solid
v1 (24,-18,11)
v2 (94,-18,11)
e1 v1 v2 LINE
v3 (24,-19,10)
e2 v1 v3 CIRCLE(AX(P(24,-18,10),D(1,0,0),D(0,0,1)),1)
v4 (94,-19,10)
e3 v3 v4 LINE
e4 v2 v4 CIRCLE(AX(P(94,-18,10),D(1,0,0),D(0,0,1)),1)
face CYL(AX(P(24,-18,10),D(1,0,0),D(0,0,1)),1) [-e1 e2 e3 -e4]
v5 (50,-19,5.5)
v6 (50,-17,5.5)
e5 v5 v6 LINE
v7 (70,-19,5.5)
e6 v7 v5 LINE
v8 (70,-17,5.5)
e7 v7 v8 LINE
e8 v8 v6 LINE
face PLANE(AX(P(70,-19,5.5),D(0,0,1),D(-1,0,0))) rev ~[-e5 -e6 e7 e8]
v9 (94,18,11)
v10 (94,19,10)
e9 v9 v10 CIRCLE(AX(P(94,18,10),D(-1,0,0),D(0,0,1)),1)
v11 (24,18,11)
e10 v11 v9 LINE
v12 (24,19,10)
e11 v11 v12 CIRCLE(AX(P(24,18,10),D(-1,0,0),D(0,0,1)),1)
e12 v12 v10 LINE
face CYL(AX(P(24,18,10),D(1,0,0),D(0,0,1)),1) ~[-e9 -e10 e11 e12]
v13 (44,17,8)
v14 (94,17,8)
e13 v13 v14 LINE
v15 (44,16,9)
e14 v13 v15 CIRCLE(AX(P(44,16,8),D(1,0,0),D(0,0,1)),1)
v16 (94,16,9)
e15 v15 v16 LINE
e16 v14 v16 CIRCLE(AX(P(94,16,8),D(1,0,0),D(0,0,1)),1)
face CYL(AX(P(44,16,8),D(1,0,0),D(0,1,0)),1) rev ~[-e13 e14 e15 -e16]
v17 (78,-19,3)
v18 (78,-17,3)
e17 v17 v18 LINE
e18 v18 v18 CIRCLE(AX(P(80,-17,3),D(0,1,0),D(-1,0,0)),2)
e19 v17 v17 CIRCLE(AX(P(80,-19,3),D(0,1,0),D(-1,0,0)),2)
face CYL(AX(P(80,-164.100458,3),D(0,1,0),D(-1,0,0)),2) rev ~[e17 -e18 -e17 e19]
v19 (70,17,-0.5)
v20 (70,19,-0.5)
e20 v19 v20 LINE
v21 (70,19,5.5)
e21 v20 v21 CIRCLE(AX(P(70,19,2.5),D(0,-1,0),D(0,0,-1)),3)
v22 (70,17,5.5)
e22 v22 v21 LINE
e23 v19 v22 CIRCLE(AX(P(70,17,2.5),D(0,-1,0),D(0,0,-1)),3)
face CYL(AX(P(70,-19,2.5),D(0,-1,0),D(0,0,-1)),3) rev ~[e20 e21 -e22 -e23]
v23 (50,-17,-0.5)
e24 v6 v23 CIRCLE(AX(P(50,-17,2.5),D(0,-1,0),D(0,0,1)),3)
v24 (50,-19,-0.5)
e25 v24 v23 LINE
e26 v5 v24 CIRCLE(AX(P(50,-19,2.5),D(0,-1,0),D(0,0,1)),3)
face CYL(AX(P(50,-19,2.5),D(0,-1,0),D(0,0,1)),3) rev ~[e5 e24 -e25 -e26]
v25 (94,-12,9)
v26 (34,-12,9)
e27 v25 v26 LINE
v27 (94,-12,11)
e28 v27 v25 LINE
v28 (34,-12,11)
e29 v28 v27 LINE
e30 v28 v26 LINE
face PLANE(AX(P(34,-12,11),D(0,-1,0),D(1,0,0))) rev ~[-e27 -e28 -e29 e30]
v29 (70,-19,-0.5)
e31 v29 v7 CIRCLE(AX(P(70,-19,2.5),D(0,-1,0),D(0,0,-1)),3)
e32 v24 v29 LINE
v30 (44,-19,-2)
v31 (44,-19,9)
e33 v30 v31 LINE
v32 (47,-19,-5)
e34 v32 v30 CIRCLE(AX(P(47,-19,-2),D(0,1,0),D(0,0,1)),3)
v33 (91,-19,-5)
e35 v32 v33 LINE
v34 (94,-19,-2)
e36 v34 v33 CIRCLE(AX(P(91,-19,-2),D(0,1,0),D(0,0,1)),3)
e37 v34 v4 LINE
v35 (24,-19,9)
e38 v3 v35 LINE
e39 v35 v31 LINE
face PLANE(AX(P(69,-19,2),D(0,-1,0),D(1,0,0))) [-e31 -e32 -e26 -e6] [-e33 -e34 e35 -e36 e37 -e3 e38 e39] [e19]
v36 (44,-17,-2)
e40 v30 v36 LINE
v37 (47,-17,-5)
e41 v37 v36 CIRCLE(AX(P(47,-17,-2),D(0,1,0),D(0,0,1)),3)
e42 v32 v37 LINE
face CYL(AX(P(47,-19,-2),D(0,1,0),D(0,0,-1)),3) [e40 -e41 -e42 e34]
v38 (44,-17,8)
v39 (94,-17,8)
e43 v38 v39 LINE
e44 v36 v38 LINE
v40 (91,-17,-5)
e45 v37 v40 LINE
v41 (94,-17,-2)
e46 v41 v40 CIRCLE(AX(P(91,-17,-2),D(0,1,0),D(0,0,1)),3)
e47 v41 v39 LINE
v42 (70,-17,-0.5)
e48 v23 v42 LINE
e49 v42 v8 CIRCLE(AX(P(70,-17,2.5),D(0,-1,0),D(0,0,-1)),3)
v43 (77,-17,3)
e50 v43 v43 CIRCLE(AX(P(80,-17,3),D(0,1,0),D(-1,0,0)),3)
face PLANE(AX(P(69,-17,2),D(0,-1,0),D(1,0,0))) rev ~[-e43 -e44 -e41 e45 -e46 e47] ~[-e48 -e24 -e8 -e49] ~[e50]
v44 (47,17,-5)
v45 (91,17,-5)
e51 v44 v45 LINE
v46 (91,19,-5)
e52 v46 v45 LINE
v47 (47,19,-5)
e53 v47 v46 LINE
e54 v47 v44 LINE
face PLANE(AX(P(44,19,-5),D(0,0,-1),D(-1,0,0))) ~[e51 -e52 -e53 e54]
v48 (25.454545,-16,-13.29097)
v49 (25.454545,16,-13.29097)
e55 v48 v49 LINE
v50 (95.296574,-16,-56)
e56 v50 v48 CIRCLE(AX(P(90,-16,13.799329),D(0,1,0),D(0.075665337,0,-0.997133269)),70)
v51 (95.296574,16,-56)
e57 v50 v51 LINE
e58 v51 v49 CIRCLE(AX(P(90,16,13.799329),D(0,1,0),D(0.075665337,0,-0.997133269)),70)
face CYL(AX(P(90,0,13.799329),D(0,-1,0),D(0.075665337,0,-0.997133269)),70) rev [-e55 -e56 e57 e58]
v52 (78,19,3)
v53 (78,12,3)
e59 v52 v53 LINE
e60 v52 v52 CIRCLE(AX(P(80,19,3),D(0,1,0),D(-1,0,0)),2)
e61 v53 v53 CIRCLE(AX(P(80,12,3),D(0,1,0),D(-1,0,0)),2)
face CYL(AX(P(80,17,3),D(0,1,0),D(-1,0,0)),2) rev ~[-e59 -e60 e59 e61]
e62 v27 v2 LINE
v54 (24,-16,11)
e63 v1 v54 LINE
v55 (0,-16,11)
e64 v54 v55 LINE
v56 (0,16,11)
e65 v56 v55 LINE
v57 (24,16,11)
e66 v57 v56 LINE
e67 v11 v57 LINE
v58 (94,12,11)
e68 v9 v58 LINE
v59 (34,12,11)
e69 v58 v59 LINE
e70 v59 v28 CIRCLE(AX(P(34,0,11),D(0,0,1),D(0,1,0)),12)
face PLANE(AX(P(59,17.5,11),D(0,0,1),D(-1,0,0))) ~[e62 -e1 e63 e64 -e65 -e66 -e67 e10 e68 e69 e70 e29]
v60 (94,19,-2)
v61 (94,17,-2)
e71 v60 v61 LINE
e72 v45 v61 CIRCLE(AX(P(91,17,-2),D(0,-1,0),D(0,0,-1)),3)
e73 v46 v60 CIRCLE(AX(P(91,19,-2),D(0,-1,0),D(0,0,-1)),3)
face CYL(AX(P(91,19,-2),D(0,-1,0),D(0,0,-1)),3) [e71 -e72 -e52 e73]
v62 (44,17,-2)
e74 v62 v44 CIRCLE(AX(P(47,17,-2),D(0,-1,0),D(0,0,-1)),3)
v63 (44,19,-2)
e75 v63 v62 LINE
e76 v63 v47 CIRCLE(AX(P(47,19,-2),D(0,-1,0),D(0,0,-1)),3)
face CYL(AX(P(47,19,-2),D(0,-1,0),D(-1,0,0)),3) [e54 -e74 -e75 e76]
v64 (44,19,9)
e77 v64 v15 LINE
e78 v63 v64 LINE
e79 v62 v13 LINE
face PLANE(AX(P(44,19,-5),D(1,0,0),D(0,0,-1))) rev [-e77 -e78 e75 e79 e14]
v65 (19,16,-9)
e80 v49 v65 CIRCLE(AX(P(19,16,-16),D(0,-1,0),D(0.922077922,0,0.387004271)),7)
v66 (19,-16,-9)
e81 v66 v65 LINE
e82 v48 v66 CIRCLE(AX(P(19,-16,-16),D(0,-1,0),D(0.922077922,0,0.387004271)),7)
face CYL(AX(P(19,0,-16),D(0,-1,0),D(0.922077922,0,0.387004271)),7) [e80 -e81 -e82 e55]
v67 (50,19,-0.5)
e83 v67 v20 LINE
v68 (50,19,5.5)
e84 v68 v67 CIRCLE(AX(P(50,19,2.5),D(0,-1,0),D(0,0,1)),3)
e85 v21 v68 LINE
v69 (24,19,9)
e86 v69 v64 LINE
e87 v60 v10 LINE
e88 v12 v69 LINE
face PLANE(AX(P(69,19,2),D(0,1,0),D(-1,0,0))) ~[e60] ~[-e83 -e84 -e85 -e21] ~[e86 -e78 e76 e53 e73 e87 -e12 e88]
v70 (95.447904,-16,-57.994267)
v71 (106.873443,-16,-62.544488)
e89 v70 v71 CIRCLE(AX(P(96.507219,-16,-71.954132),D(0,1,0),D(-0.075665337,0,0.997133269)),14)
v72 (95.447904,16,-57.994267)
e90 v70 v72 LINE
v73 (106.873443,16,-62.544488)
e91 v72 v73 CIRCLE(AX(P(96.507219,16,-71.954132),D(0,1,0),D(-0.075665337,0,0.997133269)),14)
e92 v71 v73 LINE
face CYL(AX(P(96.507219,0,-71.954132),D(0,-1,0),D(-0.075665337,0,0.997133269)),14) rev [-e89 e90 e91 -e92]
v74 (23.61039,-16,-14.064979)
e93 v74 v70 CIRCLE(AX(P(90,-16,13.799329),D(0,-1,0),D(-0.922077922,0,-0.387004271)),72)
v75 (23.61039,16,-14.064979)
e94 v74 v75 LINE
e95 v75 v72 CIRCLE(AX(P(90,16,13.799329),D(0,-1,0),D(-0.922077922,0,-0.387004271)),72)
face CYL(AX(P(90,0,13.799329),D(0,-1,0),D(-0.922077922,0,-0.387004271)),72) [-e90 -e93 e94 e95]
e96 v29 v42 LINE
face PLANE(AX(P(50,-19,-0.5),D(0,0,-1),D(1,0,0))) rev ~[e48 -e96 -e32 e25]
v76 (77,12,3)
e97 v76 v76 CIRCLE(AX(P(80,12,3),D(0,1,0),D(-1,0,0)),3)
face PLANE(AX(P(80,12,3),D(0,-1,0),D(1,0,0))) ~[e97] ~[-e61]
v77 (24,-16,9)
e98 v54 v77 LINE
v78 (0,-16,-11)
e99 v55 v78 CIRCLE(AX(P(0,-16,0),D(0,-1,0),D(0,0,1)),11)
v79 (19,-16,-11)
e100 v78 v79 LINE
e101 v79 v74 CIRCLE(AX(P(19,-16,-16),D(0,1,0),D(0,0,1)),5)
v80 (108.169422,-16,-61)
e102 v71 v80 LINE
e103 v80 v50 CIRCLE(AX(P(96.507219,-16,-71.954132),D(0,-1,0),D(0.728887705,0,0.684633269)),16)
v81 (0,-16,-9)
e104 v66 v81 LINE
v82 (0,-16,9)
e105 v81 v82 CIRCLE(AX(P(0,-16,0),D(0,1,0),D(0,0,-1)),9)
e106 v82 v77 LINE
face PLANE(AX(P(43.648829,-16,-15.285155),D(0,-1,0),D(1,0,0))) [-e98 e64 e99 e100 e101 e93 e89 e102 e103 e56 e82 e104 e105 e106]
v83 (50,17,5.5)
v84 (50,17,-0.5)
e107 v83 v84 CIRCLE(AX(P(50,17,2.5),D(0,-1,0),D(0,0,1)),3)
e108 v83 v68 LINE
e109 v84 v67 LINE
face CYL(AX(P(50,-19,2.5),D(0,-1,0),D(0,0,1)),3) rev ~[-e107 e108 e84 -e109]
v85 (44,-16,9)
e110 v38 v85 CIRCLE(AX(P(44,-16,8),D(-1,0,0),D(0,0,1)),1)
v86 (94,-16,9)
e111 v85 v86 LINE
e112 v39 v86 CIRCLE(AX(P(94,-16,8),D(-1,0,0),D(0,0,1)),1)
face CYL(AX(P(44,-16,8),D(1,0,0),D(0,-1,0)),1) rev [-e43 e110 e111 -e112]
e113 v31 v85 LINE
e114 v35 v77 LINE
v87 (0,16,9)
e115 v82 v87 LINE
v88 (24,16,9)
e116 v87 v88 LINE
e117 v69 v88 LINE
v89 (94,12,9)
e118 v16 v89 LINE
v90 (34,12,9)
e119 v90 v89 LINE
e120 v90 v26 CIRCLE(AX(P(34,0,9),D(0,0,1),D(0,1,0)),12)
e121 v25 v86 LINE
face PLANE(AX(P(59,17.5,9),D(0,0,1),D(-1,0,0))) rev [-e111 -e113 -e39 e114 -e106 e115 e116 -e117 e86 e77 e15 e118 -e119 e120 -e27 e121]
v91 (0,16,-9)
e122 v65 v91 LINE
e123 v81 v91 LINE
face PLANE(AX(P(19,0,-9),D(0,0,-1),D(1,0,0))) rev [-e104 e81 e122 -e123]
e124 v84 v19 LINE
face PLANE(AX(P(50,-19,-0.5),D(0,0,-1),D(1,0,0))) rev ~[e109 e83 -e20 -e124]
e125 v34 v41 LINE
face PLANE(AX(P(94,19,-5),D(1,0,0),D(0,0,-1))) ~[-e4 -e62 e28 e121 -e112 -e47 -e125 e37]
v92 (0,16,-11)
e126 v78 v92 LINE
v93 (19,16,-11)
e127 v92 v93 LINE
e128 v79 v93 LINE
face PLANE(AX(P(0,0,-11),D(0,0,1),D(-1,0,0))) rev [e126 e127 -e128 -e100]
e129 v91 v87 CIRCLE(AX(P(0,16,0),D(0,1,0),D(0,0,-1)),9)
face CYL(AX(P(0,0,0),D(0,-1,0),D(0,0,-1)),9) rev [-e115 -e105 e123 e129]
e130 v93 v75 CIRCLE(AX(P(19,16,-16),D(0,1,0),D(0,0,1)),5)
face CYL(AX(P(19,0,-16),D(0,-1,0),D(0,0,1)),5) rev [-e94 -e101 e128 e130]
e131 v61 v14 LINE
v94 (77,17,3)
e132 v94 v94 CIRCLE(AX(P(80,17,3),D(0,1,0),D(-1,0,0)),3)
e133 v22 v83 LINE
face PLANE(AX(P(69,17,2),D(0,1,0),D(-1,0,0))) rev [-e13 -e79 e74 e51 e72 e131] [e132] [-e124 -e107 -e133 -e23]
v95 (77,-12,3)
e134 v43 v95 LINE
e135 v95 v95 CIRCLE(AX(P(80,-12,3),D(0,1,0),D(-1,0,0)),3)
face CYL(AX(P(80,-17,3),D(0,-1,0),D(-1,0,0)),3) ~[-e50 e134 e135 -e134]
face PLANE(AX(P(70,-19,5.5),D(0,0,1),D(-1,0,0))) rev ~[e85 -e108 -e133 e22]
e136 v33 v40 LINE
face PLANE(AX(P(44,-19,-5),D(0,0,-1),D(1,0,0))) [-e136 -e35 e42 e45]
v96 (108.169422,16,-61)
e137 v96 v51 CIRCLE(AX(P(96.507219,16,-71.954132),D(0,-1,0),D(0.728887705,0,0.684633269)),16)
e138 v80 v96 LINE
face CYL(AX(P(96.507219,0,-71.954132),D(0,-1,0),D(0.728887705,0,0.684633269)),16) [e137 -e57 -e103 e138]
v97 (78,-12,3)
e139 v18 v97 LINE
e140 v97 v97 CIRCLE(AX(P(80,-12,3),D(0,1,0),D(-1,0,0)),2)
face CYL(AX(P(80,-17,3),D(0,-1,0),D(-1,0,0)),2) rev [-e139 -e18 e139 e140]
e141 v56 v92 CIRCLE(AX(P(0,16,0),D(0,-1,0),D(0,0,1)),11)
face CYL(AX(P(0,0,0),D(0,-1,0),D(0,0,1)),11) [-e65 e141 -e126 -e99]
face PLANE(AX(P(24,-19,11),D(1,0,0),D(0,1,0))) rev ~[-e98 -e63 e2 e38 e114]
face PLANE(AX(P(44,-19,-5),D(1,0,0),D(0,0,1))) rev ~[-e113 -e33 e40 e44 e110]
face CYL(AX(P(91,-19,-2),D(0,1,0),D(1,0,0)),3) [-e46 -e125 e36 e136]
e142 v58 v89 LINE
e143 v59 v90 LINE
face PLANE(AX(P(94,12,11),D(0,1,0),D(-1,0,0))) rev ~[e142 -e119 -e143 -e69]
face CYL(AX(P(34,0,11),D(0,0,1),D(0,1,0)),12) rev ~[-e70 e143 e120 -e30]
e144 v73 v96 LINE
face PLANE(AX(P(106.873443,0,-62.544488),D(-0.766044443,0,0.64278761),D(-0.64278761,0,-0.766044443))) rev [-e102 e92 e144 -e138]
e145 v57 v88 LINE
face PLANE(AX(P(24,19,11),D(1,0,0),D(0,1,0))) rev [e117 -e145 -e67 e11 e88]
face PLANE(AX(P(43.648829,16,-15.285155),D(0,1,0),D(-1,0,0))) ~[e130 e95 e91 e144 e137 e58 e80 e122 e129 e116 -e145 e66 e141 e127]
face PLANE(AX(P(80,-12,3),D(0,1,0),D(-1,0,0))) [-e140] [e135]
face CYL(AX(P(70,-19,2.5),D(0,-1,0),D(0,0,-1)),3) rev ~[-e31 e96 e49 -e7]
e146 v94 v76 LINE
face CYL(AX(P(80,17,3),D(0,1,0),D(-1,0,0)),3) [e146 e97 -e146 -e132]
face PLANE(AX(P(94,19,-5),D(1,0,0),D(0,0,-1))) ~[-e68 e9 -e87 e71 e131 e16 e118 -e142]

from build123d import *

# Parameters (mm, degrees)
F1_DEPTH  = 16
F2_W      = 70
F2_H      = 3
F3_DEPTH  = 2
F4_W      = 50
F4_H      = 14
F5_DEPTH  = 2
F6_R      = 1
F9_DEPTH  = 4
F11_DEPTH = 38.001
F13_D     = 4
F14_R     = 3
F14_R_2   = 2
F15_DEPTH = 5
F16_R     = 3


# Not quite as in the source:
# - a pattern or mirror of a feature is missing from the dataset's text; its kind, count and spacing are read off the source's solid


with BuildPart() as f1:
    # F0 (on Front) → F1 (new body)
    with BuildSketch(Plane.XZ):
        with BuildLine():
            Line((94, 11), (0, 11))
            ThreePointArc((0, 11), (-11, 0), (0, -11))
            Line((0, -11), (19, -11))
            ThreePointArc((19, -11), (21.7681124643, -11.8361612201), (23.6103896104, -14.064978646))
            ThreePointArc((23.6103896104, -14.064978646), (52.4378053116, -47.6260855158), (95.4479042723, -57.9942665386))
            ThreePointArc((95.4479042723, -57.9942665386), (101.6870615127, -58.9476250352), (106.8734428361, -62.5444881493))
            Line((106.8734428361, -62.5444881493), (108.1694222725, -61))
            ThreePointArc((108.1694222725, -61), (102.3002117906, -57.039668375), (95.2965735981, -56))
            ThreePointArc((95.2965735981, -56), (53.4811996085, -45.9198240056), (25.4545454545, -13.2909701044))
            ThreePointArc((25.4545454545, -13.2909701044), (22.87535745, -10.1706257081), (19, -9))
            Line((19, -9), (0, -9))
            ThreePointArc((0, -9), (-9, 0), (0, 9))
            Line((0, 9), (94, 9))
            Line((94, 9), (94, 11))
        make_face()
    extrude(amount=F1_DEPTH)

    # F2 (on face) → F3 (join)
    with BuildSketch(Plane.XY.offset(11)):
        with Locations((59, -17.5)):
            Rectangle(F2_W, F2_H)
    extrude(amount=-F3_DEPTH)

    # F4 (on face) → F5 (join)
    with BuildSketch(Plane.XZ.offset(19)):
        with Locations((69, 2)):
            Rectangle(F4_W, F4_H)
    extrude(amount=-F5_DEPTH)

    # F6
    f6_edges = [f1.edges().sort_by_distance(p)[0] for p in [
        (59, -19, 11),
        (69, -17, 9),
    ]]
    fillet(f6_edges, radius=F6_R)

    # F7: F1 across plane


with BuildPart() as f1_1:
    add(f1.part)
    add(f1.part.mirror(Plane.XZ))

    # F8 (on face) → F9 (cut)
    with BuildSketch(Plane.XY.offset(11)):
        with BuildLine():
            Line((94, 12), (34, 12))
            ThreePointArc((34, 12), (22, 0), (34, -12))
            Line((34, -12), (94, -12))
            Line((94, -12), (94, 12))
        make_face()
    extrude(amount=-F9_DEPTH, mode=Mode.SUBTRACT)

    # F10 (on face) → F11 (cut, through all)
    with BuildSketch(Plane.XZ.offset(19)):
        with BuildLine():
            ThreePointArc((70, -0.5), (73, 2.5), (70, 5.5))
            Line((70, 5.5), (50, 5.5))
            ThreePointArc((50, 5.5), (47, 2.5), (50, -0.5))
            Line((50, -0.5), (70, -0.5))
        make_face()
    extrude(amount=-F11_DEPTH, mode=Mode.SUBTRACT)

    # F13 (through all)
    with Locations(Plane.XZ.offset(19)):
        with Locations((80, 3)):
            Hole(F13_D / 2)

    # F14 (on face) → F15 (join)
    with BuildSketch(Plane(origin=(0, -17, 0), x_dir=(-1, 0, 0), z_dir=(0, 1, 0))):
        with Locations((-80, 3)):
            Circle(F14_R)
        with Locations((-80, 3)):
            Circle(F14_R_2, mode=Mode.SUBTRACT)
    f15 = extrude(amount=F15_DEPTH)

    # F15_copies: F15 across plane
    add(f15.mirror(Plane.ZX))

    # F16
    f16_edges = [f1_1.edges().sort_by_distance(p)[0] for p in [
        (94, 18, -5),
        (44, 18, -5),
        (94, -18, -5),
        (44, -18, -5),
    ]]
    fillet(f16_edges, radius=F16_R)


solid = f1_1.part
